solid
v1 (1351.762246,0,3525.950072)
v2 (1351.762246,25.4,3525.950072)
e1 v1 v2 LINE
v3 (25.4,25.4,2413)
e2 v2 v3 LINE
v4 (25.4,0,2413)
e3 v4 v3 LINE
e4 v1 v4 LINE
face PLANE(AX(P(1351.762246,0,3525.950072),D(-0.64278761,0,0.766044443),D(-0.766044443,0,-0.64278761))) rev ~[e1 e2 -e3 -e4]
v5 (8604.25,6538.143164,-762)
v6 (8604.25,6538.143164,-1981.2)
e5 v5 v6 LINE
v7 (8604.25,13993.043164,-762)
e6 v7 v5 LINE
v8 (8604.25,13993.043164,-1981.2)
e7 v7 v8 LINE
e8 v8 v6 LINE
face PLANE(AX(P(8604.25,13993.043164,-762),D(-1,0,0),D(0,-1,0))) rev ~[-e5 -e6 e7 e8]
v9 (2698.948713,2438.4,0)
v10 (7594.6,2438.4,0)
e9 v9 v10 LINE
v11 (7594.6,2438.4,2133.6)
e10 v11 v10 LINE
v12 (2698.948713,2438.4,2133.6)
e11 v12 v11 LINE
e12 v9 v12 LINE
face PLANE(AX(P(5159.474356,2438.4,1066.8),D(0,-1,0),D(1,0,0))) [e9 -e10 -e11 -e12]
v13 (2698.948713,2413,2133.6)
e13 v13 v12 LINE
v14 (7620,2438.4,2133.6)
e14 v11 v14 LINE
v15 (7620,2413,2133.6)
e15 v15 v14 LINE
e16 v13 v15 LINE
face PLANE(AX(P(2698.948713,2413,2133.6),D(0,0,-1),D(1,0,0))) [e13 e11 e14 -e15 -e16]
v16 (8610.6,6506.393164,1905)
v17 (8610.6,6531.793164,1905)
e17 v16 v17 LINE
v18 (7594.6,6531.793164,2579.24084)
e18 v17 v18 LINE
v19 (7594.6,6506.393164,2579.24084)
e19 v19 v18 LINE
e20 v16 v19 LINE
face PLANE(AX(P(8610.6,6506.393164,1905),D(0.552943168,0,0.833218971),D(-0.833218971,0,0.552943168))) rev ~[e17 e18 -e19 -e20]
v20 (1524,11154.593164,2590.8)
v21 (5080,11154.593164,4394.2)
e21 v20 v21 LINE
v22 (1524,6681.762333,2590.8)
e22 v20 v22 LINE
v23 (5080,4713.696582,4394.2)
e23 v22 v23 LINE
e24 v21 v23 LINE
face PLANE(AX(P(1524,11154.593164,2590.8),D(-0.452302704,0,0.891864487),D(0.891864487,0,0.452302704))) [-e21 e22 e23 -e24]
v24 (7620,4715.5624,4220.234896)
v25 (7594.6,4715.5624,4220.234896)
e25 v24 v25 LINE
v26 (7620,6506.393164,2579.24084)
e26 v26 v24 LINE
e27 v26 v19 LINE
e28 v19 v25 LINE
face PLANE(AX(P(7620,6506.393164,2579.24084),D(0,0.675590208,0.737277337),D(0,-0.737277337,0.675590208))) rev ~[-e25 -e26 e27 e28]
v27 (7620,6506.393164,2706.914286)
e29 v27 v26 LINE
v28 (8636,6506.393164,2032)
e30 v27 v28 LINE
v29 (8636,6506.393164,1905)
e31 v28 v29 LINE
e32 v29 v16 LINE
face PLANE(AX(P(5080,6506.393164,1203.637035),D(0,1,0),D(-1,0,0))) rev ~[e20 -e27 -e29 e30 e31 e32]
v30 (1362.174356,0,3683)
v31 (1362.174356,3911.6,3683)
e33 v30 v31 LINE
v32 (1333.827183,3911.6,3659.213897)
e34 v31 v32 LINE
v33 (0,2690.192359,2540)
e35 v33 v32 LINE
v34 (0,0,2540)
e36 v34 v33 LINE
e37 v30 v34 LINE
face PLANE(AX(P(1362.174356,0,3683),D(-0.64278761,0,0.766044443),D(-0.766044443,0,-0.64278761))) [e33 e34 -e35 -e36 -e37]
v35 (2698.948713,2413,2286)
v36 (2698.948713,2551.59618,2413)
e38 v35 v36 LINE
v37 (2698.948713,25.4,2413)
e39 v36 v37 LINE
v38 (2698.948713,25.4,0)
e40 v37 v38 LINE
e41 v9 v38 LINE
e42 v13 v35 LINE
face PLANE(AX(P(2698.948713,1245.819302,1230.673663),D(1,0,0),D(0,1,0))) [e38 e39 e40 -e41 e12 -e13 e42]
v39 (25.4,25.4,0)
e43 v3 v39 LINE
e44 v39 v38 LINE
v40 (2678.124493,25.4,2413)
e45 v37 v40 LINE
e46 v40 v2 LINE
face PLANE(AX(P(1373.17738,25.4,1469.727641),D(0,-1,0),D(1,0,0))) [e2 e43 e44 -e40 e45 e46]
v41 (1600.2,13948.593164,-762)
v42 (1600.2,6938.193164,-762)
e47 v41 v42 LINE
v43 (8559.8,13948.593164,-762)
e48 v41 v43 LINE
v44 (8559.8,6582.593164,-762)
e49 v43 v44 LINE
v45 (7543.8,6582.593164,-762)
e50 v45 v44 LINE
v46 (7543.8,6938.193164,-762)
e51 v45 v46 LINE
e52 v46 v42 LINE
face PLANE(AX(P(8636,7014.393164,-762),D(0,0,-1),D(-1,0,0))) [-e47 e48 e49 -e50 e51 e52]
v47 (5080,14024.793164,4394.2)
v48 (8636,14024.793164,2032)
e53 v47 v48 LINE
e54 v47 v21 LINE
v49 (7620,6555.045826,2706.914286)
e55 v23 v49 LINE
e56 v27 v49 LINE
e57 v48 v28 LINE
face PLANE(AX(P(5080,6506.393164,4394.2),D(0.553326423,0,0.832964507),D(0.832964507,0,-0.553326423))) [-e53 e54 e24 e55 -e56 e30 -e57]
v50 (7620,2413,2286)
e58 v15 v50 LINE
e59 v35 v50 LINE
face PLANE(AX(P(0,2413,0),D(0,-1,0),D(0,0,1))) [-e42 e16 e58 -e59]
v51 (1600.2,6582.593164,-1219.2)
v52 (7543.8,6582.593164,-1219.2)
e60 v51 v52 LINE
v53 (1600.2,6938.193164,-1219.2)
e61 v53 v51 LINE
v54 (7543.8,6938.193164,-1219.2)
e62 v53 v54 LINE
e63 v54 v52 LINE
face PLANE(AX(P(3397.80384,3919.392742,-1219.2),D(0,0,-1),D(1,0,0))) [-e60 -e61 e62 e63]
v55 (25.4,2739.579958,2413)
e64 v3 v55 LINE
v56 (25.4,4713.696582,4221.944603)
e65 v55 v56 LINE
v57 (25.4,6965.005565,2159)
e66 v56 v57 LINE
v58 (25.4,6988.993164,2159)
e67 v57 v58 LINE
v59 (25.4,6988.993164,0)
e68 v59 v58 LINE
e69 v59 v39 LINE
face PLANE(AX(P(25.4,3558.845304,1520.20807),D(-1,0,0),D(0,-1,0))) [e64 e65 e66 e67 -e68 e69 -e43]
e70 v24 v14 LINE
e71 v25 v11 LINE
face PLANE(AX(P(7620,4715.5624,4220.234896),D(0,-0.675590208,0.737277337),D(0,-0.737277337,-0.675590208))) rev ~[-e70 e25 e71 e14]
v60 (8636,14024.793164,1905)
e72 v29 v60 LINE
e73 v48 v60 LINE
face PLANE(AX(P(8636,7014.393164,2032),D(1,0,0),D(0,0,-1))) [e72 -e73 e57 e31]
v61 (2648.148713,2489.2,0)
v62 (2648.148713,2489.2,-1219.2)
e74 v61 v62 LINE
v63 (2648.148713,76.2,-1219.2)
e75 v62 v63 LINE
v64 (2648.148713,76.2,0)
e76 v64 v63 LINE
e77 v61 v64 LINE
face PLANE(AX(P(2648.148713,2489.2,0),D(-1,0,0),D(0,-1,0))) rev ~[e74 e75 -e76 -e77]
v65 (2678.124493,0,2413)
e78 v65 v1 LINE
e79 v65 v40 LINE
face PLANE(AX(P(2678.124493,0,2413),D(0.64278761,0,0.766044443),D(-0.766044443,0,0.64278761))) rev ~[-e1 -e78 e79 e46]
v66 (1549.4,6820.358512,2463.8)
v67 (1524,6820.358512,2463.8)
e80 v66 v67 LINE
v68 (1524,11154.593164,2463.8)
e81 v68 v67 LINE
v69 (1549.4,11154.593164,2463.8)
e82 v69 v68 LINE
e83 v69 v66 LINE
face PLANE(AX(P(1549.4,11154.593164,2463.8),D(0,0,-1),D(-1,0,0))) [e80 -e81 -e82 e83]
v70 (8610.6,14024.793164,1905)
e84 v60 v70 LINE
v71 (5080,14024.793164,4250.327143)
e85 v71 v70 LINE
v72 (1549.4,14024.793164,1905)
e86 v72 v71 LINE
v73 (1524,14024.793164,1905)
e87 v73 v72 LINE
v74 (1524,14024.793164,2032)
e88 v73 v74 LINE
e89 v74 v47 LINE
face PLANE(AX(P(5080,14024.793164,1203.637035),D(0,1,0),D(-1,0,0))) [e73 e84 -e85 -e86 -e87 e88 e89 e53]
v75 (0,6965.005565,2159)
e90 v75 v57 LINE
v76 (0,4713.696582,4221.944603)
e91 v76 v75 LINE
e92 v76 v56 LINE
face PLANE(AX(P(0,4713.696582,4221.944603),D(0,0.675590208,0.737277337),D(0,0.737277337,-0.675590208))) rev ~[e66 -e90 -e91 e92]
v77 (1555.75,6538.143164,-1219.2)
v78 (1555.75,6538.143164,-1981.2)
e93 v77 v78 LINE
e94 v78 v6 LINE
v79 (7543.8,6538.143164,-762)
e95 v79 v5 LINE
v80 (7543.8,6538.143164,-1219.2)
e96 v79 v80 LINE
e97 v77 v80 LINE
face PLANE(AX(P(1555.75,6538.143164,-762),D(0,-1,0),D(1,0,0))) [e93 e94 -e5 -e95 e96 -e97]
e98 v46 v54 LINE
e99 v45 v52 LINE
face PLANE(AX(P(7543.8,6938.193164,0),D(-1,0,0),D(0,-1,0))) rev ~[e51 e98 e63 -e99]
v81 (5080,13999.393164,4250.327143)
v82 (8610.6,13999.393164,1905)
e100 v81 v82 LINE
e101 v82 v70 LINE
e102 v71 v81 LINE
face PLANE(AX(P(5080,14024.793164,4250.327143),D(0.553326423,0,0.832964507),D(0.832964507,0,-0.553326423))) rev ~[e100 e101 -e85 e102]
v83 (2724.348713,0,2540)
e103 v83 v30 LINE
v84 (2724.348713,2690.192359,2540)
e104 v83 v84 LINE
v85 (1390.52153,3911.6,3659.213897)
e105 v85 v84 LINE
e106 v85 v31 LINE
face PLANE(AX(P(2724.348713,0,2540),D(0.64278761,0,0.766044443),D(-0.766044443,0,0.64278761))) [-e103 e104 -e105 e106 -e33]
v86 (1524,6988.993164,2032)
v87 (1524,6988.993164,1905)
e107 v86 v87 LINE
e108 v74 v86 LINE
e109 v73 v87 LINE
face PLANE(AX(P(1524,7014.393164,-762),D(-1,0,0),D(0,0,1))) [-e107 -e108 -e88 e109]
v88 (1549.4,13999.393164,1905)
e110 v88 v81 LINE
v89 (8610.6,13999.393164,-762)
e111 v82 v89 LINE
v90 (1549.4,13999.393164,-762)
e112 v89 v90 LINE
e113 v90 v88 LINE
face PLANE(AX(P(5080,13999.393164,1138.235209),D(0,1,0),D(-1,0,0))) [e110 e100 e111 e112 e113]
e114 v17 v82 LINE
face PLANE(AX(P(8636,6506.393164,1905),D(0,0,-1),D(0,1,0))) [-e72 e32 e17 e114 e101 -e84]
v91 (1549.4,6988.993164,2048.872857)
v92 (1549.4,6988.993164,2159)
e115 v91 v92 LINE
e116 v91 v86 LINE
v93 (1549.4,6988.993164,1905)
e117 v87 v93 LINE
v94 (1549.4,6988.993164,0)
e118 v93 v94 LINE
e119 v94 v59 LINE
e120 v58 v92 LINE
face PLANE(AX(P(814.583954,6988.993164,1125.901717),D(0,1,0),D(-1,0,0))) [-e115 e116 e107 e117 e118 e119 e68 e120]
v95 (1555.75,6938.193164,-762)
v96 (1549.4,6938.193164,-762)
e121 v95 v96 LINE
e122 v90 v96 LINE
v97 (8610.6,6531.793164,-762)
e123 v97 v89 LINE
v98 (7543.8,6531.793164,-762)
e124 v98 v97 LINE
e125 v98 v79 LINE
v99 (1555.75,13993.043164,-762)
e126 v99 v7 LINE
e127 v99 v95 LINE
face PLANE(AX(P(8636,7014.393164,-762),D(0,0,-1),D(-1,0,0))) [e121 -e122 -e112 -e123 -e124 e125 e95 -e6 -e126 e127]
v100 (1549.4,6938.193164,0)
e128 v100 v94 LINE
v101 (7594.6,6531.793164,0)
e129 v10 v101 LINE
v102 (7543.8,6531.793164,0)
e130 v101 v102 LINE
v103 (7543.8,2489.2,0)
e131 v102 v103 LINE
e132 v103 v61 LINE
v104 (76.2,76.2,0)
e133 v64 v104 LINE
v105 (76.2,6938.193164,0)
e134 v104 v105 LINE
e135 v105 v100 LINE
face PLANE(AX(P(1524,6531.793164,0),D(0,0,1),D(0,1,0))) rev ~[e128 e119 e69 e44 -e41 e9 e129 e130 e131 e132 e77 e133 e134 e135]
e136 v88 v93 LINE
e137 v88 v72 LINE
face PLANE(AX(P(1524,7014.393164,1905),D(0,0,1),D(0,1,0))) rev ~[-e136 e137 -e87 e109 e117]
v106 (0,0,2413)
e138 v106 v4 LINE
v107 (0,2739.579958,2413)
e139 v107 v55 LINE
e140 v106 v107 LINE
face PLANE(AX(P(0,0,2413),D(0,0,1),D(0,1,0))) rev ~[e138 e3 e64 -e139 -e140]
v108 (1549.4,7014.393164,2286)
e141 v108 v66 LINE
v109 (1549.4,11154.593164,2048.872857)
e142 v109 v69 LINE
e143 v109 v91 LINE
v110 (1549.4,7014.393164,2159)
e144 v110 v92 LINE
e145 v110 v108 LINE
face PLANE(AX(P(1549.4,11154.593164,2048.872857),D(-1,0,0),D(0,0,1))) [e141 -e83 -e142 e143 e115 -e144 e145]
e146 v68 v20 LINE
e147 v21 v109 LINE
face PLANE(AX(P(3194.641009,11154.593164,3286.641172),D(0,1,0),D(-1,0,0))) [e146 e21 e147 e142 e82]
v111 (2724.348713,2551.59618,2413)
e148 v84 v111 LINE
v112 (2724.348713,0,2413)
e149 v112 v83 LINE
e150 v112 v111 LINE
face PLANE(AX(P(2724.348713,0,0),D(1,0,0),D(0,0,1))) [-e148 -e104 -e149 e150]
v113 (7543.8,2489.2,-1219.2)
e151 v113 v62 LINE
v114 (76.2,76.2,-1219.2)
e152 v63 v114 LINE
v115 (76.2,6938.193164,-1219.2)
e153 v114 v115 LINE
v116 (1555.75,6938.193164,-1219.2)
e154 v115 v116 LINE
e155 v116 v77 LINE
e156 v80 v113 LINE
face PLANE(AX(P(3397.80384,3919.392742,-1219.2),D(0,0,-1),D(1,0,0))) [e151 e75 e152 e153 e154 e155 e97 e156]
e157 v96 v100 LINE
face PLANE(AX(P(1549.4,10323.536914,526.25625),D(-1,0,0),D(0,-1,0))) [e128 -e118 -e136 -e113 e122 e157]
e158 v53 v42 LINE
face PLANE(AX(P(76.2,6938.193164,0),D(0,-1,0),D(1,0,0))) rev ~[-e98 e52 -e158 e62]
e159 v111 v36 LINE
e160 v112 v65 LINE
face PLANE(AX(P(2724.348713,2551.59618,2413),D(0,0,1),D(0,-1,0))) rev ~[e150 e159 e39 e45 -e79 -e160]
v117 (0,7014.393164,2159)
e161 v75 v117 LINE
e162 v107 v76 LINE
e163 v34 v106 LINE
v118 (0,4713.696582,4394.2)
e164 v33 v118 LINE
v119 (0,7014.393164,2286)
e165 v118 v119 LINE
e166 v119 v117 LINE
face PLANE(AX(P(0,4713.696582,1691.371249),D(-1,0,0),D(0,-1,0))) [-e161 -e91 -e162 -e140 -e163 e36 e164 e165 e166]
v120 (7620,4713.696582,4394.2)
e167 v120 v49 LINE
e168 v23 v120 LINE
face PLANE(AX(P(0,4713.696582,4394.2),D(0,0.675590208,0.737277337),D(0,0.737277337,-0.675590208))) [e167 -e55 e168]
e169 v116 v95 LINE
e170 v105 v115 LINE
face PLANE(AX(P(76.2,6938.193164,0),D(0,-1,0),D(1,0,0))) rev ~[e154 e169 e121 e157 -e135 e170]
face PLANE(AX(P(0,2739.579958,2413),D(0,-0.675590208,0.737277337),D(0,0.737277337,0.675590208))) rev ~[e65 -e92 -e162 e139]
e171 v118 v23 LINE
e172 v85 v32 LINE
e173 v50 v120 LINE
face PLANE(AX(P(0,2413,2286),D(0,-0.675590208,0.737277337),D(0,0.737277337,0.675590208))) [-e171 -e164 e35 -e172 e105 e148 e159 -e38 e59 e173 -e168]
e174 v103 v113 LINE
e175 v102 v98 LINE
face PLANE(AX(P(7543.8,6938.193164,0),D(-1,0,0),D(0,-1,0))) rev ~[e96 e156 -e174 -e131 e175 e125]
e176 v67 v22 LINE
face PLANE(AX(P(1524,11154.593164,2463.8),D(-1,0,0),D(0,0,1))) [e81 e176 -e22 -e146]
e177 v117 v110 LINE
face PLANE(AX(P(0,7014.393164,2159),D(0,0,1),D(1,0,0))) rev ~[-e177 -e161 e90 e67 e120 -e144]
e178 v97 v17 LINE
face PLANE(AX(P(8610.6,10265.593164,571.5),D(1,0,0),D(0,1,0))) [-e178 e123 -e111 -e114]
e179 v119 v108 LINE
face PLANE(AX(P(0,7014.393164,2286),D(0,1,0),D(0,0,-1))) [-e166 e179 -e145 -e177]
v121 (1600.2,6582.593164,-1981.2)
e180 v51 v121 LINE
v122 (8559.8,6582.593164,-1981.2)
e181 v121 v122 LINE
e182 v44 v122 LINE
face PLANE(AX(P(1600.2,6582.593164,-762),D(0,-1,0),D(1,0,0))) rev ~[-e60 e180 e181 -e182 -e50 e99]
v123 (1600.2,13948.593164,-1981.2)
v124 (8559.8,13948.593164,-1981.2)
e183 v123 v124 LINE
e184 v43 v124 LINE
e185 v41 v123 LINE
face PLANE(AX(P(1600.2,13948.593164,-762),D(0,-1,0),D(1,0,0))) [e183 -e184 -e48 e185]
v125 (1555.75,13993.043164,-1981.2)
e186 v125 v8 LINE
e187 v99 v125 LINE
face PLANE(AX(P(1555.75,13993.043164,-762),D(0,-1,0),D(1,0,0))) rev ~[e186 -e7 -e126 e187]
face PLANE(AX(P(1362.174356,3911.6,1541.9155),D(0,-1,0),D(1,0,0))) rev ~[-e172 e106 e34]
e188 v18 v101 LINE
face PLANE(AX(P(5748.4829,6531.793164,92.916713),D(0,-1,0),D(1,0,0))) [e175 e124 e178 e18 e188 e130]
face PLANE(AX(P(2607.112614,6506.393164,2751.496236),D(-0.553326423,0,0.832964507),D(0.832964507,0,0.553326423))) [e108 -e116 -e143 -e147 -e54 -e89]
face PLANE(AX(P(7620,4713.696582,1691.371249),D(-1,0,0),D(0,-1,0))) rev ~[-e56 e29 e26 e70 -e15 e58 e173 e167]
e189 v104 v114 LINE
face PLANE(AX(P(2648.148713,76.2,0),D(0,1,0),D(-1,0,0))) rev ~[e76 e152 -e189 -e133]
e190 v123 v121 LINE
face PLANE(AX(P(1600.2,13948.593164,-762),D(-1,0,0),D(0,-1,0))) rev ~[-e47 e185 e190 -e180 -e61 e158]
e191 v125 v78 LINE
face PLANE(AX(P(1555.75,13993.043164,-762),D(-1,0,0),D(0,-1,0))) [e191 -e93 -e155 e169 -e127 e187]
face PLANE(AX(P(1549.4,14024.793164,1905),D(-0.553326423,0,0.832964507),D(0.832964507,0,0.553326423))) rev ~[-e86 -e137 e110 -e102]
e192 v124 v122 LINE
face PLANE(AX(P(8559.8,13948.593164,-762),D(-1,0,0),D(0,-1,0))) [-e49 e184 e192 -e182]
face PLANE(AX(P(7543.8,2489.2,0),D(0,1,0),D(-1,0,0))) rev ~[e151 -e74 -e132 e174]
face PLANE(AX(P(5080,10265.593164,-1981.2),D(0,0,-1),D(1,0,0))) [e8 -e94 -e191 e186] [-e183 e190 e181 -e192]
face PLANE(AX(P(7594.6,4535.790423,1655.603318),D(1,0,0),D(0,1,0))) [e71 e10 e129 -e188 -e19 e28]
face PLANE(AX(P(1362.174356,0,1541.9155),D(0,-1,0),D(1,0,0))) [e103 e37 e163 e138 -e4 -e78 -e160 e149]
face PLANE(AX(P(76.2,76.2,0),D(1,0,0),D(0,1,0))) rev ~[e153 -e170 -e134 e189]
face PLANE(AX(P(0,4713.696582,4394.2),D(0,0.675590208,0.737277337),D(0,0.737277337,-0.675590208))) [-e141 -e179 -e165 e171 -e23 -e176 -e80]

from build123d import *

# Parameters (mm, degrees)
F1_DEPTH  = 3911.6
F3_DEPTH  = 7620
F5_DEPTH  = 7010.4
F6_DEPTH  = 508
F7_DEPTH  = 1792.6965819542
F9_DEPTH  = 25.4
F11_DEPTH = 25.4
F13_DEPTH = 25.4
F14_W     = 4921.0512873296
F14_H     = 2133.6
F15_DEPTH = 25.4
F17_DEPTH = 25.4
F18_W     = 7518.4
F18_H     = 2667
F19_DEPTH = 25.4
F21_DEPTH = 25.4
F23_DEPTH = 25.4
F25_DEPTH = 25.4
F27_DEPTH = 25.4
F29_DEPTH = 25.4
F32_DEPTH = 6440.8965819542
F33_W     = 7048.5
F33_H     = 7454.9
F33_W_2   = 6959.6
F33_H_2   = 7366
F34_DEPTH = 1219.2
F36_DEPTH = 1219.2


with BuildPart() as f1:
    # F0 (on Front) → F1 (new body)
    with BuildSketch(Plane.XZ):
        Polygon((0, 2540), (0, 0), (2724.3487126704, 0), (2724.3487126704, 2540), (1362.1743563352, 3683), align=None)
    extrude(amount=-F1_DEPTH)

    # F2 (on face) → F3 (join)
    with BuildSketch(Plane(origin=(0, 0, 0), x_dir=(0, -1, 0), z_dir=(-1, 0, 0))):
        Polygon((-4713.6965819542, 4394.2), (-7014.3931639085, 2286), (-7014.3931639085, 0), (-2413, 0), (-2413, 2286), align=None)
    extrude(amount=-F3_DEPTH)

    # F4 (on face) → F5 (join)
    with BuildSketch(Plane(origin=(0, 7014.3931639085, 0), x_dir=(-1, 0, 0), z_dir=(0, 1, 0))):
        Polygon((-8636, -762), (-1524, -762), (-1524, 2032), (-5080, 4394.2), (-8636, 2032), align=None)
    extrude(amount=F5_DEPTH)

    # F6 (add): a face of the model
    f6_faces = [f1.faces().sort_by_distance(p)[0] for p in [
        (8548.1552833461, 7014.3931639085, 635),
    ]]
    extrude(f6_faces, amount=F6_DEPTH)

    # F7 (add, through all): a face of the model
    f7_faces = [f1.faces().sort_by_distance(p)[0] for p in [
        (5080, 6506.3931639085, 3299.0641576006),
    ]]
    extrude(f7_faces, amount=F7_DEPTH)

    # F8 (on face) → F9 (cut)
    with BuildSketch(Plane(origin=(0, 0, 0), x_dir=(0, -1, 0), z_dir=(-1, 0, 0))):
        Polygon((-4713.6965819542, 4221.9446034765), (-7014.3931639085, 2113.7446034765), (-7014.3931639085, 0), (0, 0), (0, 2413), (-2739.5799582169, 2413), align=None)
    extrude(amount=-F9_DEPTH, mode=Mode.SUBTRACT)

    # F10 (on face) → F11 (cut)
    with BuildSketch(Plane.XZ):
        Polygon((1351.7622464593, 3525.9500718114), (25.4, 2413), (25.4, 0), (2724.3487126704, 0), (2724.3487126704, 2413), (2678.1244929186, 2413), align=None)
    extrude(amount=-F11_DEPTH, mode=Mode.SUBTRACT)

    # F12 (on face) → F13 (cut)
    with BuildSketch(Plane.YZ.offset(2724.3487126704)):
        Polygon((2551.5961796358, 2413), (25.4, 2413), (25.4, 0), (2413, 0), (2413, 2286), align=None)
    extrude(amount=-F13_DEPTH, mode=Mode.SUBTRACT)

    # F14 (on face) → F15 (cut)
    with BuildSketch(Plane.XZ.offset(-2413)):
        with Locations((5159.4743563352, 1066.8)):
            Rectangle(F14_W, F14_H)
    extrude(amount=-F15_DEPTH, mode=Mode.SUBTRACT)

    # F16 (on face) → F17 (cut)
    with BuildSketch(Plane.YZ.offset(7620)):
        Polygon((4715.5624004452, 4220.2348958282), (2438.4, 2133.6), (2438.4, 0), (6506.3931639085, 0), (6506.3931639085, 2579.2408398774), align=None)
    extrude(amount=-F17_DEPTH, mode=Mode.SUBTRACT)

    # F18 (on face) → F19 (cut)
    with BuildSketch(Plane.YZ.offset(8636)):
        with Locations((10265.5931639085, 571.5)):
            Rectangle(F18_W, F18_H)
    extrude(amount=-F19_DEPTH, mode=Mode.SUBTRACT)

    # F20 (on face) → F21 (cut)
    with BuildSketch(Plane.XZ.offset(-6506.3931639085)):
        Polygon((8610.6, -762), (8610.6, 1905), (7594.6, 2579.2408398774), (7594.6, 0), (1524, 0), (1524, -762), align=None)
    extrude(amount=-F21_DEPTH, mode=Mode.SUBTRACT)

    # F22 (on face) → F23 (cut)
    with BuildSketch(Plane(origin=(1524, 0, 0), x_dir=(0, -1, 0), z_dir=(-1, 0, 0))):
        Polygon((-7014.3931639085, 1905), (-14024.7931639085, 1905), (-14024.7931639085, -762), (-6531.7931639085, -762), (-6531.7931639085, 0), (-7014.3931639085, 0), align=None)
    extrude(amount=-F23_DEPTH, mode=Mode.SUBTRACT)

    # F24 (on face) → F25 (cut)
    with BuildSketch(Plane(origin=(0, 14024.7931639085, 0), x_dir=(-1, 0, 0), z_dir=(0, 1, 0))):
        Polygon((-5080, 4250.3271428571), (-8610.6, 1905), (-8610.6, -762), (-1549.4, -762), (-1549.4, 1905), align=None)
    extrude(amount=-F25_DEPTH, mode=Mode.SUBTRACT)

    # F26 (on face) → F27 (cut)
    with BuildSketch(Plane(origin=(0, 7014.3931639085, 0), x_dir=(-1, 0, 0), z_dir=(0, 1, 0))):
        Polygon((0, 2159), (-1715.1827956989, 2159), (-1524, 2032), (-1524, 1905), (-1549.4, 1905), (-1549.4, 0), (-25.4, 0), (-25.4, 2113.7446034765), (0, 2113.7446034765), align=None)
    extrude(amount=-F27_DEPTH, mode=Mode.SUBTRACT)

    # F28 (on face) → F29 (cut, through all)
    with BuildSketch(Plane(origin=(0, 0, 0), x_dir=(0, -1, 0), z_dir=(-1, 0, 0))):
        Polygon((-6965.0055649631, 2159), (-6988.9931639085, 2159), (-6988.9931639085, 2137.0194152966), align=None)
    extrude(amount=-F29_DEPTH, mode=Mode.SUBTRACT)

    # F31 (on offset) → F32 (join, through all)
    with BuildSketch(Plane(origin=(0, 11154.5931639085, 0), x_dir=(-1, 0, 0), z_dir=(0, 1, 0))):
        Polygon((-1524, 2590.8), (-5080, 4394.2), (-1549.4, 2048.8728571429), (-1549.4, 2463.8), (-1524, 2463.8), align=None)
    extrude(amount=-F32_DEPTH)

    # F33 (on face) → F34 (join)
    with BuildSketch(Plane(origin=(0, 0, -762), x_dir=(1, 0, 0), z_dir=(0, 0, -1))):
        with Locations((5080, -10265.5931639085)):
            Rectangle(F33_W, F33_H)
        with Locations((5080, -10265.5931639085)):
            Rectangle(F33_W_2, F33_H_2, mode=Mode.SUBTRACT)
    extrude(amount=F34_DEPTH)

    # F35 (on face) → F36 (join)
    with BuildSketch(Plane(origin=(0, 0, 0), x_dir=(1, 0, 0), z_dir=(0, 0, -1))):
        Polygon((2648.1487126704, -76.2), (76.2, -76.2), (76.2, -6938.1931639085), (7543.8, -6938.1931639085), (7543.8, -2489.2), (2648.1487126704, -2489.2), align=None)
    extrude(amount=F36_DEPTH)


solid = f1.part
